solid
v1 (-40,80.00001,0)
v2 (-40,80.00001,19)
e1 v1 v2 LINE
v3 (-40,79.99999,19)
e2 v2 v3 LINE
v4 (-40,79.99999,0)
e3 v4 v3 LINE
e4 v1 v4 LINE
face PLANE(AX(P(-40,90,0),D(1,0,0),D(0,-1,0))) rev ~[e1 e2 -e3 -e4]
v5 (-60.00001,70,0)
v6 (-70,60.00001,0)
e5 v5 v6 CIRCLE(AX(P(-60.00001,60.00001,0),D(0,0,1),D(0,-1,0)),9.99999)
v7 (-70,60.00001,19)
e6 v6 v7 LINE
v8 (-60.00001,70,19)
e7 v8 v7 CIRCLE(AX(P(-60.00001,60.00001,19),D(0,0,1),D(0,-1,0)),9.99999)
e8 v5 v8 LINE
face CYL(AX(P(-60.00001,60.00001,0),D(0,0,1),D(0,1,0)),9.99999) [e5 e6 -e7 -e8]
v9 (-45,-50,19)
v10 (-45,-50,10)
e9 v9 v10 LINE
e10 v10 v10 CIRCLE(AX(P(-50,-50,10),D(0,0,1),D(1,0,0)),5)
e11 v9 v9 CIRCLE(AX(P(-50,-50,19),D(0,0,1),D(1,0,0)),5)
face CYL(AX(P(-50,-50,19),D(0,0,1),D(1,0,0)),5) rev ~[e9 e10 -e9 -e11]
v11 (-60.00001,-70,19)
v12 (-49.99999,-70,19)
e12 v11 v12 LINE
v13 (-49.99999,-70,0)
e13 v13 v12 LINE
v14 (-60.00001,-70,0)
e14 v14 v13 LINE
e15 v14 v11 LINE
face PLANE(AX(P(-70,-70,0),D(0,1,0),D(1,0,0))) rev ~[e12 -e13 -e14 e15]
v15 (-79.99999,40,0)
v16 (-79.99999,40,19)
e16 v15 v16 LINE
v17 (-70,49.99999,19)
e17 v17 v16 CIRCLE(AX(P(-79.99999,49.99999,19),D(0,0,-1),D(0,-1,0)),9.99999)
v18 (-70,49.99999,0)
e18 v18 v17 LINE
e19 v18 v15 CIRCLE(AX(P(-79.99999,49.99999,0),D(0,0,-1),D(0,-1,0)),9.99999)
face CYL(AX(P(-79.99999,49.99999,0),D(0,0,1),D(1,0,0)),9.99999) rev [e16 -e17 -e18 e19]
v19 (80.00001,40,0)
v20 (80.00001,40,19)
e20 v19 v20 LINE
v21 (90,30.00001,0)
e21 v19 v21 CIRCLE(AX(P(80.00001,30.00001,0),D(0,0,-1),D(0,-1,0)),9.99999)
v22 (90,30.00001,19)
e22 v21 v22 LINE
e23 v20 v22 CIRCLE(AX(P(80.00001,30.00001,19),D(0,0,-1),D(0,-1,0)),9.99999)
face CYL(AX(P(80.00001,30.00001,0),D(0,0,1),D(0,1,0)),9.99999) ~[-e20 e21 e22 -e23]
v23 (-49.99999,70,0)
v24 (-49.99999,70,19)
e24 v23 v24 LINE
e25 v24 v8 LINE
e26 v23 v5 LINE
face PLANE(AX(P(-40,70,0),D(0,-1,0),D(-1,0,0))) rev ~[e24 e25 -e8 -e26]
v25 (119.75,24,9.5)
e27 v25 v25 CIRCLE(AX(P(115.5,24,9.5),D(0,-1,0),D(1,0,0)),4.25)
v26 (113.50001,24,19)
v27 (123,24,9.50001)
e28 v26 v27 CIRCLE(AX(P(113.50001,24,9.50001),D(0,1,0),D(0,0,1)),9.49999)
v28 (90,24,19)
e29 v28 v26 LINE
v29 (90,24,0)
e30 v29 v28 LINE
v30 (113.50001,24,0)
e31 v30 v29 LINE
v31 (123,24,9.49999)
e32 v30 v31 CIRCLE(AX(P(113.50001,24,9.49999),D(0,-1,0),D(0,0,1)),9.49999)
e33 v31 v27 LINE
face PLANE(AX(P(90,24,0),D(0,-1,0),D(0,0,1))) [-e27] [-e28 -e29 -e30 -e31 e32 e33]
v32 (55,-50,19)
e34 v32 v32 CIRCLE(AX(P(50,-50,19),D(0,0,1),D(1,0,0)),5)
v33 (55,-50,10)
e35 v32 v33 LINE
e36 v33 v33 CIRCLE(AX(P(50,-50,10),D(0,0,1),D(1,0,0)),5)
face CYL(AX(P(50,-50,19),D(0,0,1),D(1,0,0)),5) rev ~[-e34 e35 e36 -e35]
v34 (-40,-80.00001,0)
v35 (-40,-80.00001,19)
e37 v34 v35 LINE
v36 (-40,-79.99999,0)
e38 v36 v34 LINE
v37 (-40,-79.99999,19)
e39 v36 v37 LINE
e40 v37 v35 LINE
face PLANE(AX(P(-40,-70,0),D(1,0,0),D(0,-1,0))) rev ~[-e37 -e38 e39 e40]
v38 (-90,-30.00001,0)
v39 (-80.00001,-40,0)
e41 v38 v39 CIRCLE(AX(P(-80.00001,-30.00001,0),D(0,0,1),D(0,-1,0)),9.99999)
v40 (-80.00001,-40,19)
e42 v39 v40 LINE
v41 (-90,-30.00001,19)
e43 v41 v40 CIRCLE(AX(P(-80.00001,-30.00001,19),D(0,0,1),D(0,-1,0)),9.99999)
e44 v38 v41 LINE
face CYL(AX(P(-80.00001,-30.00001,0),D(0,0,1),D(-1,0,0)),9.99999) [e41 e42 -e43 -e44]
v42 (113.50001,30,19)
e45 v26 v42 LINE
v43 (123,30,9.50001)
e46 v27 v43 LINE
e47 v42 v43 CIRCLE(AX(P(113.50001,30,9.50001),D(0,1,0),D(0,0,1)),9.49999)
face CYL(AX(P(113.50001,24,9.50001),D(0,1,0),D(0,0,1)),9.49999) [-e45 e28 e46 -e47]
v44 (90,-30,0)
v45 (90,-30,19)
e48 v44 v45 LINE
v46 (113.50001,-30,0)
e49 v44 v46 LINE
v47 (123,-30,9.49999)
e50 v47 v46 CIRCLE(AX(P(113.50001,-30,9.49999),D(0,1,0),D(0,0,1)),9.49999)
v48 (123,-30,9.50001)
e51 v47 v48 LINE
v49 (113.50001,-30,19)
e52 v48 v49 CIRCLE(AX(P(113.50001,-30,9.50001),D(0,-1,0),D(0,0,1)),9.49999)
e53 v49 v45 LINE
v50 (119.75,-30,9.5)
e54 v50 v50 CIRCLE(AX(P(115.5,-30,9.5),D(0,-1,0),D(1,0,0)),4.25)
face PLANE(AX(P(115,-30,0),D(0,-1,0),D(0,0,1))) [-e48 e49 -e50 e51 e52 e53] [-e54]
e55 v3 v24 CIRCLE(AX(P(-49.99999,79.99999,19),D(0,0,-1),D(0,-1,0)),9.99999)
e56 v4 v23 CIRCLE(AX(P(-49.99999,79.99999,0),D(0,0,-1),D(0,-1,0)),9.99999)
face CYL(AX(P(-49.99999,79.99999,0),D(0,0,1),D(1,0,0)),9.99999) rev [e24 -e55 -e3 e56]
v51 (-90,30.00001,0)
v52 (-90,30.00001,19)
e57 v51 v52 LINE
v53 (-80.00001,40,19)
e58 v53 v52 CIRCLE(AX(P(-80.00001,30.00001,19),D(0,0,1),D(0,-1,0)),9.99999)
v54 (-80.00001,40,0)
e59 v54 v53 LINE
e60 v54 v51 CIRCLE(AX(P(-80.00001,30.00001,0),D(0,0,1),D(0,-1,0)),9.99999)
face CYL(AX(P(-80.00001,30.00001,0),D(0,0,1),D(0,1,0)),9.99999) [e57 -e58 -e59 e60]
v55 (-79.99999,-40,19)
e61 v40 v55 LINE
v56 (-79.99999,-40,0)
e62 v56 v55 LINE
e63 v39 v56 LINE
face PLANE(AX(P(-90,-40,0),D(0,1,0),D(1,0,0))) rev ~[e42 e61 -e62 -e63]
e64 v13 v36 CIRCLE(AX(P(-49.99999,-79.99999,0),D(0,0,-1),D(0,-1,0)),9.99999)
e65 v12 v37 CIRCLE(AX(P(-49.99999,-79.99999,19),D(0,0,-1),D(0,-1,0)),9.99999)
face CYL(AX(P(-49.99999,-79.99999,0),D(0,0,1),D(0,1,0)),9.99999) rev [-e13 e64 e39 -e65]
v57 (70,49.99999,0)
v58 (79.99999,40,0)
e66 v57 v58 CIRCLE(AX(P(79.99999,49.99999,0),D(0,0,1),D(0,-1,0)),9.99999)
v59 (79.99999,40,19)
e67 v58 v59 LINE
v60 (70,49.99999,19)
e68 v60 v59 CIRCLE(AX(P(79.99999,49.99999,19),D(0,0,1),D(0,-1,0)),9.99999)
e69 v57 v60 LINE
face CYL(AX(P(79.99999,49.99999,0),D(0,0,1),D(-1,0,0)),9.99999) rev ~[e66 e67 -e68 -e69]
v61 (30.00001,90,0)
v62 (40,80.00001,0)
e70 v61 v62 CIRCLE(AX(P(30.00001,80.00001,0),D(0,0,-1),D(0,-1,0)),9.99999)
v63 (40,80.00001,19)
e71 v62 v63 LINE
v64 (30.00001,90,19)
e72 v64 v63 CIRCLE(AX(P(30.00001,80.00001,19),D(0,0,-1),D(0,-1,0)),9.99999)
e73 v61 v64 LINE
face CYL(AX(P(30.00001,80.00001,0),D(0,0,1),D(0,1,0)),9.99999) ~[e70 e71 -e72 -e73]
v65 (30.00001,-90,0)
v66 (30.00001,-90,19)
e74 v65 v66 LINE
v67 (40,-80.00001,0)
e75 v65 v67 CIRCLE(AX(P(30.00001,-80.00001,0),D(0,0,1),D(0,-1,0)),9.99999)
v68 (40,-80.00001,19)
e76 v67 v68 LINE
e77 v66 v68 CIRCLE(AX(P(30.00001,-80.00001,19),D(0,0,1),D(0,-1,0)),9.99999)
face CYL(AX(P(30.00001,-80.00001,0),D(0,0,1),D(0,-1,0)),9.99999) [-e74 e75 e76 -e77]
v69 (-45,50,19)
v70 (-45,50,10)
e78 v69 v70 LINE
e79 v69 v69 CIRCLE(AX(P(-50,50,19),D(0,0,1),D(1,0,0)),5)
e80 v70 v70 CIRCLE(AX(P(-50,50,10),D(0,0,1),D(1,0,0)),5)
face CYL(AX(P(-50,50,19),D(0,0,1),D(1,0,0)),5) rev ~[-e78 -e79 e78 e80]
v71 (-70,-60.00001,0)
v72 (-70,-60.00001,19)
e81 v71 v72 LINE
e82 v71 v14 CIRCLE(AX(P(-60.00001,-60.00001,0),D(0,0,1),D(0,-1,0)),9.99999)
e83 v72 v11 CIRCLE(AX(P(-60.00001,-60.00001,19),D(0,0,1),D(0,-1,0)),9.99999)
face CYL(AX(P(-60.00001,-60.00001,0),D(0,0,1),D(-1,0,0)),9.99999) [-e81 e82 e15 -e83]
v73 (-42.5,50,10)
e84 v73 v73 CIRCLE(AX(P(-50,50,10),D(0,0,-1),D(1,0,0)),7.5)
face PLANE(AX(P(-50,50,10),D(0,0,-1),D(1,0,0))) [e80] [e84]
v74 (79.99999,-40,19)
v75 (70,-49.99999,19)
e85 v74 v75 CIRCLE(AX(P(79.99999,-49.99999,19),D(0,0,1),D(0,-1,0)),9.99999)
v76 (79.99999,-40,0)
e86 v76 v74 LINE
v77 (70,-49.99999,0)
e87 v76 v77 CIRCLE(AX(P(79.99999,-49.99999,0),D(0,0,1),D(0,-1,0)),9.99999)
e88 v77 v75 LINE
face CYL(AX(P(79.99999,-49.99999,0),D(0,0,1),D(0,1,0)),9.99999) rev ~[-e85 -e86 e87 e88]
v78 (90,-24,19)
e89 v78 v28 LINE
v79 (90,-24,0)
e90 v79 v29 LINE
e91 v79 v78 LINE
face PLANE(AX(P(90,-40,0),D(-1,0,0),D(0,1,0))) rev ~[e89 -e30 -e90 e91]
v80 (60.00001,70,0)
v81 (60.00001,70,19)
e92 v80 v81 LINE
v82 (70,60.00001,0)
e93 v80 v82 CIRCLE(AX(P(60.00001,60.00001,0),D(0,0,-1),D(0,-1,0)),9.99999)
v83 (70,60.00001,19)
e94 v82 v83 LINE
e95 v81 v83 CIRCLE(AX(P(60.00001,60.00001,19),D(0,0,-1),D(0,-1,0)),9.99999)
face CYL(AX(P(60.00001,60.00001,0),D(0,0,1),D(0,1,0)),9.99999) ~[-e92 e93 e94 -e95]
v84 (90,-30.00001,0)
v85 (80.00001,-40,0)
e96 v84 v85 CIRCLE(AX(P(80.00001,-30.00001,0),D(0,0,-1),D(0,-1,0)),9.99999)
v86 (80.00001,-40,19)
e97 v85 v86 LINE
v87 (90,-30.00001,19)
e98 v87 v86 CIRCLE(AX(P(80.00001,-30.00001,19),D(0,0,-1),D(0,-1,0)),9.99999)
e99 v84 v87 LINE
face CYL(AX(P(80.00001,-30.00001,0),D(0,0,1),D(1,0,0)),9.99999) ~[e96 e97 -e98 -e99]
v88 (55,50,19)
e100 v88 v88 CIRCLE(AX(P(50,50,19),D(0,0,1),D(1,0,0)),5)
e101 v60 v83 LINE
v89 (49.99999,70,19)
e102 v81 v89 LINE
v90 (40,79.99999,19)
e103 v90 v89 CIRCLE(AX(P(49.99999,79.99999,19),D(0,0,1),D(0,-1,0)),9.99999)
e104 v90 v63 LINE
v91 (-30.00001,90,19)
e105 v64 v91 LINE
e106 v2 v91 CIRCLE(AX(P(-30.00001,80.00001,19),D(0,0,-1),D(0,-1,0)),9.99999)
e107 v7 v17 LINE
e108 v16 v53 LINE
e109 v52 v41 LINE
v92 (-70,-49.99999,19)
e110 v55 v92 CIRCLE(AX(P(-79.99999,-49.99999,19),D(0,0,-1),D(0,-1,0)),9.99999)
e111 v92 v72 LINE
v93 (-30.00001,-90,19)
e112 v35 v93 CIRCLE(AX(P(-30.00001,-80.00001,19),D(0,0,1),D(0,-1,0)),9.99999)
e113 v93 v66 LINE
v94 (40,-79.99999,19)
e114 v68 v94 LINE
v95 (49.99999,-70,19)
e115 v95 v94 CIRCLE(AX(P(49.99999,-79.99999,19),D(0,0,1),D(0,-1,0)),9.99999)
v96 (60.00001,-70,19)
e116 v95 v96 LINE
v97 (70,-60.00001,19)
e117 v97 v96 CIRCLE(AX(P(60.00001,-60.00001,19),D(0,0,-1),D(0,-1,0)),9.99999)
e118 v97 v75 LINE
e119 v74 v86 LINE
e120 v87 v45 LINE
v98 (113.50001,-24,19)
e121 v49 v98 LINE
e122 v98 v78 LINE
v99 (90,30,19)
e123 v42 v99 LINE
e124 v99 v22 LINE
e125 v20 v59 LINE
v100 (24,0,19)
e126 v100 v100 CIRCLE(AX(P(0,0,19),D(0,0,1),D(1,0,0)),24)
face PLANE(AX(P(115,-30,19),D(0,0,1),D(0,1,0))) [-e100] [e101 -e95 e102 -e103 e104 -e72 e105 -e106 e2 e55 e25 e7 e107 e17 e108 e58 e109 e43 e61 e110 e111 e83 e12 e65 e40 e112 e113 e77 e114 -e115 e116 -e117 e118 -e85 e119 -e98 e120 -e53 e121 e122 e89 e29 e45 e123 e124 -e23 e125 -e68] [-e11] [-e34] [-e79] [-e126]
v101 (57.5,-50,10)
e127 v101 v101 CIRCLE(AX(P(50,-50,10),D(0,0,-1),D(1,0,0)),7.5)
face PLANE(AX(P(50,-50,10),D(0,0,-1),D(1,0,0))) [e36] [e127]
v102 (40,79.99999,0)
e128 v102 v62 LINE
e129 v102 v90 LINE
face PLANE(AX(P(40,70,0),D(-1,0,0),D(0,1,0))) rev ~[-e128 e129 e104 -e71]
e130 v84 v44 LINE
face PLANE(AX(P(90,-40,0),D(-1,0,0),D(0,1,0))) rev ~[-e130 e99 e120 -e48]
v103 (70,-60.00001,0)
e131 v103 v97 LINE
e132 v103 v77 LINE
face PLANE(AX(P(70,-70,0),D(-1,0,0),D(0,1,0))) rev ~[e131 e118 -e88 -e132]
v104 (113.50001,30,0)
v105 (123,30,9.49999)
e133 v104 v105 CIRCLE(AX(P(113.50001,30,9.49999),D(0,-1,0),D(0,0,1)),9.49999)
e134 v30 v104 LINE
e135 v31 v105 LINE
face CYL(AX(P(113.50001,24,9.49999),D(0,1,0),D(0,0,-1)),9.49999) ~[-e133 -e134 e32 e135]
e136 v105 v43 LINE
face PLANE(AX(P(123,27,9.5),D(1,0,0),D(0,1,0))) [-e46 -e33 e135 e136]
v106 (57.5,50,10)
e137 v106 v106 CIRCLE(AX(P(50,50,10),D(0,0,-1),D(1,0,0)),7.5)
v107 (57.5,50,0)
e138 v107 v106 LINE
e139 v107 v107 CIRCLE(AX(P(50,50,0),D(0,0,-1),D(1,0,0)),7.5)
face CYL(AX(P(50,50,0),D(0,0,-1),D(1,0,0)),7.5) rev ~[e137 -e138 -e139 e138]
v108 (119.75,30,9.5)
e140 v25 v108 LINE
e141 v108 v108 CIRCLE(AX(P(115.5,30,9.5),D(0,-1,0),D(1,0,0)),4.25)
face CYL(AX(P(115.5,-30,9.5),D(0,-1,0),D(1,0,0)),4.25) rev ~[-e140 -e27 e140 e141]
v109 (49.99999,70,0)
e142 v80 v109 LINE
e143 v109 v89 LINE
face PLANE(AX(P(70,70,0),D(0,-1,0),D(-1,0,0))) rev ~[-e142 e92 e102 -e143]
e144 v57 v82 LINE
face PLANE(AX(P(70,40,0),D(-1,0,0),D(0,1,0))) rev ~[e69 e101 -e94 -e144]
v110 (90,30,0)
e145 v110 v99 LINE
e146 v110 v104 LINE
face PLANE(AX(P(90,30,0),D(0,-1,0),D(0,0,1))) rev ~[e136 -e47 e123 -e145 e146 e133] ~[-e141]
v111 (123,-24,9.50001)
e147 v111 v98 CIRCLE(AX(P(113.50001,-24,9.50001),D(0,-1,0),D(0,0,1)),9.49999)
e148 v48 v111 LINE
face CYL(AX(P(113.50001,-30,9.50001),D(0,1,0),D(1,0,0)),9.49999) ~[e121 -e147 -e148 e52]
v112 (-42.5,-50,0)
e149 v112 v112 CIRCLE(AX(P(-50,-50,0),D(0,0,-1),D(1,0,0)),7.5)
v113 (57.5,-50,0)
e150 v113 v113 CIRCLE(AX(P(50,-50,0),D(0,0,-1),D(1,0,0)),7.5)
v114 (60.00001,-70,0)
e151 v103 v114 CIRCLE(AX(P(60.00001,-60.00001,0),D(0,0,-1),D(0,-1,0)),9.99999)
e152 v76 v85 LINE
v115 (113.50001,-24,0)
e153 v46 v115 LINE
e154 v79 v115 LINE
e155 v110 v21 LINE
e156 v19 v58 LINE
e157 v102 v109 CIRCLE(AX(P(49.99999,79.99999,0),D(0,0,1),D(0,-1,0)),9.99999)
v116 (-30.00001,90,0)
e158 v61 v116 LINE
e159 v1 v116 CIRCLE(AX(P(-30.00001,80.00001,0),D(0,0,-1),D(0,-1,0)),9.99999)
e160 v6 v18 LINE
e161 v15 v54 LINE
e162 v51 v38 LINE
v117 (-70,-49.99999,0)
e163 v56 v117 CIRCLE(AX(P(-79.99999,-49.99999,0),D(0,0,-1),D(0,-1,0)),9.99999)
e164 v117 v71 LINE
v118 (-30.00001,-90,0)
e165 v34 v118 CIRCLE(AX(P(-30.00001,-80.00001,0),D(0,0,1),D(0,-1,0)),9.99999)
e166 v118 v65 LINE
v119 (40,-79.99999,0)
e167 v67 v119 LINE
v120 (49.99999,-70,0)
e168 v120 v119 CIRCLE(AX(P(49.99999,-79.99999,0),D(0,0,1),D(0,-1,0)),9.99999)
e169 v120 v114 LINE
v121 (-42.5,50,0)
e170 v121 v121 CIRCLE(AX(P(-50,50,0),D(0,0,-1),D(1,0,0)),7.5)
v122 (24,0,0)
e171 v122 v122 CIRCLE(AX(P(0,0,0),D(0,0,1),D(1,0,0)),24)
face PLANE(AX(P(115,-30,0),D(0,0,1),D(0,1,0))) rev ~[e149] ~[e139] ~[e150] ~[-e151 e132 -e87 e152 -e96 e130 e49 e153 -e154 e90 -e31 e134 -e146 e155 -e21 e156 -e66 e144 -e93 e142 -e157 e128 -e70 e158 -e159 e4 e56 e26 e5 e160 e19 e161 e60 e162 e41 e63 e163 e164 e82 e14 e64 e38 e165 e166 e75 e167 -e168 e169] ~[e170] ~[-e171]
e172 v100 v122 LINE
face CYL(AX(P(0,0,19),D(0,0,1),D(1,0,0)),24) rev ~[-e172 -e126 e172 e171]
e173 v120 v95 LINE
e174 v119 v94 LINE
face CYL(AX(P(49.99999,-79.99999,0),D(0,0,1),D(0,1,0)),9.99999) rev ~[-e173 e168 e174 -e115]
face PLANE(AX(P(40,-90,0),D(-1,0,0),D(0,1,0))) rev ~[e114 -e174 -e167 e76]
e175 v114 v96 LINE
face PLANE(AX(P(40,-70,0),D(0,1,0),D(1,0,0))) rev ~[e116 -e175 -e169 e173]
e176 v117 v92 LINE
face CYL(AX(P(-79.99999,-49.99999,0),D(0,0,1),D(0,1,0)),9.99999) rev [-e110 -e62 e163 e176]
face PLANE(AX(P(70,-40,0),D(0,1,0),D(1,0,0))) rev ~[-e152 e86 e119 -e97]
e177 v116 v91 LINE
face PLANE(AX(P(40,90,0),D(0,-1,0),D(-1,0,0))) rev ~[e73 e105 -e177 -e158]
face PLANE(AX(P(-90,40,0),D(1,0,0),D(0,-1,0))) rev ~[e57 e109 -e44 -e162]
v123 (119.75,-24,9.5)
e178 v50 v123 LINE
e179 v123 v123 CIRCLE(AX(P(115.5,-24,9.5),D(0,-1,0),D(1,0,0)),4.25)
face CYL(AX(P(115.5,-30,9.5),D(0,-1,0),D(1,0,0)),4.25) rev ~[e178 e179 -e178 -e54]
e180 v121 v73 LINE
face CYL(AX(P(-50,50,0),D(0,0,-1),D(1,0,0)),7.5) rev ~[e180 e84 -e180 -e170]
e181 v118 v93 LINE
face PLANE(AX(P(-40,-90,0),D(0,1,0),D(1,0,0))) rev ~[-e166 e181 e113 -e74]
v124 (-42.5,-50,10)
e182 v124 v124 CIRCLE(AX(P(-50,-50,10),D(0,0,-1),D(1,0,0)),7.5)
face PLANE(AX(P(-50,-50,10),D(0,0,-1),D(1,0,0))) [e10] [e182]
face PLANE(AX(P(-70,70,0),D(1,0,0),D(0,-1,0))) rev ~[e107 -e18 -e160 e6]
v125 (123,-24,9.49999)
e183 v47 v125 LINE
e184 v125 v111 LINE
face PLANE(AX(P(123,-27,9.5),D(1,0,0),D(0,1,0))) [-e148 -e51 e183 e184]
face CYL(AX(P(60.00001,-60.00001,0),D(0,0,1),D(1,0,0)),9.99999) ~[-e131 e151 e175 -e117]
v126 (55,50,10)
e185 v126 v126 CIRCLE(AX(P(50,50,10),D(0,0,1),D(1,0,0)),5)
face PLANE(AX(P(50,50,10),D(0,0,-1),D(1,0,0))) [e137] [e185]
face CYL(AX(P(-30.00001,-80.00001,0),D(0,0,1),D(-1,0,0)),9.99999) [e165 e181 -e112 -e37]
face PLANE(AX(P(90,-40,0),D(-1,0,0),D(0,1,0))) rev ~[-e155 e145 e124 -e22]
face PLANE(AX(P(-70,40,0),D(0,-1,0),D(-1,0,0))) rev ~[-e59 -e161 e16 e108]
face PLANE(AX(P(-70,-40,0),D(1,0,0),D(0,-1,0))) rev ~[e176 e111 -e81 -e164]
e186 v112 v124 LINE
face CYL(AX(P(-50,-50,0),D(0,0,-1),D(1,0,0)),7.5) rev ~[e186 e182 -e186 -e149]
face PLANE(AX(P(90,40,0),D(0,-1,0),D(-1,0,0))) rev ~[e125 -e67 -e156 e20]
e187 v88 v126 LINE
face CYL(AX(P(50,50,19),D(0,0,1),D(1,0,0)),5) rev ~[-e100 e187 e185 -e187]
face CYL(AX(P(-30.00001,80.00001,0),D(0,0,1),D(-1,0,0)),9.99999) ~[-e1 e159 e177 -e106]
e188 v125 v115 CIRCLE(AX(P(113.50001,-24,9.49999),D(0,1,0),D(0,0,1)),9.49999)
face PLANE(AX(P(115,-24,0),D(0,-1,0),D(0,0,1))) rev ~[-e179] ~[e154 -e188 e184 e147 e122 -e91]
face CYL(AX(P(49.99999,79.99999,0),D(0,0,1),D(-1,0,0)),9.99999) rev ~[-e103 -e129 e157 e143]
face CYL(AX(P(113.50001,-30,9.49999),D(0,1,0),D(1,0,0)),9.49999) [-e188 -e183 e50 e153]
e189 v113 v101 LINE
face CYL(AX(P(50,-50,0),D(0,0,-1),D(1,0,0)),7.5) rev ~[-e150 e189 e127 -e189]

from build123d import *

# Parameters (mm, degrees)
F1_DEPTH  = 19
F2_R      = 24
F3_DEPTH  = 25
F4_R      = 9.99999
F5_R      = 5
F6_DEPTH  = 25
F7_R      = 7.5
F8_DEPTH  = 10
F9_W      = 6
F9_H      = 19
F10_DEPTH = 25
F11_DEPTH = 25
F12_R     = 4.25
F13_DEPTH = 250
F15_DEPTH = 8
F16_R     = 4.25
F17_DEPTH = 250
F18_R     = 9.49999


# Not quite as in the source:
# - a fillet or chamfer is up to 0.001 mm smaller than in the source, because OpenCascade refuses the exact size


with BuildPart() as f1:
    # F0 (on Top) → F1 (new body)
    with BuildSketch(Plane.XY):
        Polygon((0, 90), (-40, 90), (-40, 70), (-70, 70), (-70, 40), (-90, 40), (-90, 0), (0, 0), align=None)
        Polygon((40, 90), (0, 90), (0, 0), (90, 0), (90, 40), (70, 40), (70, 70), (40, 70), align=None)
        Polygon((0, -90), (0, 0), (-90, 0), (-90, -40), (-70, -40), (-70, -70), (-40, -70), (-40, -90), align=None)
        Polygon((90, 0), (0, 0), (0, -90), (40, -90), (40, -70), (70, -70), (70, -40), (90, -40), align=None)
    extrude(amount=F1_DEPTH)

    # F2 (on face) → F3 (cut)
    with BuildSketch(Plane.XY.offset(19)):
        Circle(F2_R)
    extrude(amount=-F3_DEPTH, mode=Mode.SUBTRACT)

    # F4 (radius 10 in the source; OpenCascade refuses exactly that, so slightly less here)
    f4_edges = [f1.edges().sort_by_distance(p)[0] for p in [
        (-70, 40, 9.5),
        (-40, 70, 9.5),
        (-40, 90, 9.5),
        (-70, 70, 9.5),
        (-90, 40, 9.5),
        (-40, -90, 9.5),
        (-40, -70, 9.5),
        (-70, -70, 9.5),
        (-70, -40, 9.5),
        (-90, -40, 9.5),
        (40, -90, 9.5),
        (40, -70, 9.5),
        (70, -70, 9.5),
        (70, -40, 9.5),
        (90, -40, 9.5),
        (90, 40, 9.5),
        (70, 40, 9.5),
        (70, 70, 9.5),
        (40, 70, 9.5),
        (40, 90, 9.5),
    ]]
    fillet(f4_edges, radius=F4_R)

    # F5 (on face) → F6 (cut)
    with BuildSketch(Plane.XY.offset(19)):
        with Locations((-50, -50)):
            Circle(F5_R)
        with Locations((50, -50)):
            Circle(F5_R)
        with Locations((-50, 50)):
            Circle(F5_R)
        with Locations((50, 50)):
            Circle(F5_R)
    extrude(amount=-F6_DEPTH, mode=Mode.SUBTRACT)

    # F7 (on face) → F8 (cut)
    with BuildSketch(Plane(origin=(0, 0, 0), x_dir=(1, 0, 0), z_dir=(0, 0, -1))):
        with Locations((-50, 50)):
            Circle(F7_R)
        with Locations((50, 50)):
            Circle(F7_R)
        with Locations((-50, -50)):
            Circle(F7_R)
        with Locations((50, -50)):
            Circle(F7_R)
    extrude(amount=-F8_DEPTH, mode=Mode.SUBTRACT)

    # F9 (on face) → F10 (join)
    with BuildSketch(Plane.YZ.offset(90)):
        with Locations((-27, 9.5)):
            Rectangle(F9_W, F9_H)
        with Locations((27, 9.5)):
            Rectangle(F9_W, F9_H)
    extrude(amount=F10_DEPTH)

    # F9 (on face) → F11 (join)
    with BuildSketch(Plane.YZ.offset(90)):
        with Locations((-27, 9.5)):
            Rectangle(F9_W, F9_H)
        with Locations((27, 9.5)):
            Rectangle(F9_W, F9_H)
    extrude(amount=F11_DEPTH)

    # F12 (on face) → F13 (cut)
    with BuildSketch(Plane.XZ.offset(30)):
        with BuildLine():
            ThreePointArc((125, 0), (134.5, 9.5), (125, 19))
            Line((125, 19), (115, 19))
            Line((115, 19), (115, 0))
            Line((115, 0), (125, 0))
        make_face()
        with Locations((125, 9.5)):
            Circle(F12_R, mode=Mode.SUBTRACT)
        with Locations((125, 9.5)):
            Circle(F12_R)
    extrude(amount=-F13_DEPTH, mode=Mode.SUBTRACT)

    # F15 (add): faces of the model
    f15_faces = [f1.faces().sort_by_distance(p)[0] for p in [
        (115, -27, 9.5),
        (115, 27, 9.5),
    ]]
    extrude(f15_faces, amount=F15_DEPTH)

    # F16 (on face) → F17 (cut)
    with BuildSketch(Plane.XZ.offset(30)):
        with Locations((115.5, 9.5)):
            Circle(F16_R)
    extrude(amount=-F17_DEPTH, mode=Mode.SUBTRACT)

    # F18 (radius 9.5 in the source; OpenCascade refuses exactly that, so slightly less here)
    f18_edges = [f1.edges().sort_by_distance(p)[0] for p in [
        (123, 27, 0),
        (123, -27, 0),
        (123, -27, 19),
        (123, 27, 19),
    ]]
    fillet(f18_edges, radius=F18_R)


solid = f1.part
